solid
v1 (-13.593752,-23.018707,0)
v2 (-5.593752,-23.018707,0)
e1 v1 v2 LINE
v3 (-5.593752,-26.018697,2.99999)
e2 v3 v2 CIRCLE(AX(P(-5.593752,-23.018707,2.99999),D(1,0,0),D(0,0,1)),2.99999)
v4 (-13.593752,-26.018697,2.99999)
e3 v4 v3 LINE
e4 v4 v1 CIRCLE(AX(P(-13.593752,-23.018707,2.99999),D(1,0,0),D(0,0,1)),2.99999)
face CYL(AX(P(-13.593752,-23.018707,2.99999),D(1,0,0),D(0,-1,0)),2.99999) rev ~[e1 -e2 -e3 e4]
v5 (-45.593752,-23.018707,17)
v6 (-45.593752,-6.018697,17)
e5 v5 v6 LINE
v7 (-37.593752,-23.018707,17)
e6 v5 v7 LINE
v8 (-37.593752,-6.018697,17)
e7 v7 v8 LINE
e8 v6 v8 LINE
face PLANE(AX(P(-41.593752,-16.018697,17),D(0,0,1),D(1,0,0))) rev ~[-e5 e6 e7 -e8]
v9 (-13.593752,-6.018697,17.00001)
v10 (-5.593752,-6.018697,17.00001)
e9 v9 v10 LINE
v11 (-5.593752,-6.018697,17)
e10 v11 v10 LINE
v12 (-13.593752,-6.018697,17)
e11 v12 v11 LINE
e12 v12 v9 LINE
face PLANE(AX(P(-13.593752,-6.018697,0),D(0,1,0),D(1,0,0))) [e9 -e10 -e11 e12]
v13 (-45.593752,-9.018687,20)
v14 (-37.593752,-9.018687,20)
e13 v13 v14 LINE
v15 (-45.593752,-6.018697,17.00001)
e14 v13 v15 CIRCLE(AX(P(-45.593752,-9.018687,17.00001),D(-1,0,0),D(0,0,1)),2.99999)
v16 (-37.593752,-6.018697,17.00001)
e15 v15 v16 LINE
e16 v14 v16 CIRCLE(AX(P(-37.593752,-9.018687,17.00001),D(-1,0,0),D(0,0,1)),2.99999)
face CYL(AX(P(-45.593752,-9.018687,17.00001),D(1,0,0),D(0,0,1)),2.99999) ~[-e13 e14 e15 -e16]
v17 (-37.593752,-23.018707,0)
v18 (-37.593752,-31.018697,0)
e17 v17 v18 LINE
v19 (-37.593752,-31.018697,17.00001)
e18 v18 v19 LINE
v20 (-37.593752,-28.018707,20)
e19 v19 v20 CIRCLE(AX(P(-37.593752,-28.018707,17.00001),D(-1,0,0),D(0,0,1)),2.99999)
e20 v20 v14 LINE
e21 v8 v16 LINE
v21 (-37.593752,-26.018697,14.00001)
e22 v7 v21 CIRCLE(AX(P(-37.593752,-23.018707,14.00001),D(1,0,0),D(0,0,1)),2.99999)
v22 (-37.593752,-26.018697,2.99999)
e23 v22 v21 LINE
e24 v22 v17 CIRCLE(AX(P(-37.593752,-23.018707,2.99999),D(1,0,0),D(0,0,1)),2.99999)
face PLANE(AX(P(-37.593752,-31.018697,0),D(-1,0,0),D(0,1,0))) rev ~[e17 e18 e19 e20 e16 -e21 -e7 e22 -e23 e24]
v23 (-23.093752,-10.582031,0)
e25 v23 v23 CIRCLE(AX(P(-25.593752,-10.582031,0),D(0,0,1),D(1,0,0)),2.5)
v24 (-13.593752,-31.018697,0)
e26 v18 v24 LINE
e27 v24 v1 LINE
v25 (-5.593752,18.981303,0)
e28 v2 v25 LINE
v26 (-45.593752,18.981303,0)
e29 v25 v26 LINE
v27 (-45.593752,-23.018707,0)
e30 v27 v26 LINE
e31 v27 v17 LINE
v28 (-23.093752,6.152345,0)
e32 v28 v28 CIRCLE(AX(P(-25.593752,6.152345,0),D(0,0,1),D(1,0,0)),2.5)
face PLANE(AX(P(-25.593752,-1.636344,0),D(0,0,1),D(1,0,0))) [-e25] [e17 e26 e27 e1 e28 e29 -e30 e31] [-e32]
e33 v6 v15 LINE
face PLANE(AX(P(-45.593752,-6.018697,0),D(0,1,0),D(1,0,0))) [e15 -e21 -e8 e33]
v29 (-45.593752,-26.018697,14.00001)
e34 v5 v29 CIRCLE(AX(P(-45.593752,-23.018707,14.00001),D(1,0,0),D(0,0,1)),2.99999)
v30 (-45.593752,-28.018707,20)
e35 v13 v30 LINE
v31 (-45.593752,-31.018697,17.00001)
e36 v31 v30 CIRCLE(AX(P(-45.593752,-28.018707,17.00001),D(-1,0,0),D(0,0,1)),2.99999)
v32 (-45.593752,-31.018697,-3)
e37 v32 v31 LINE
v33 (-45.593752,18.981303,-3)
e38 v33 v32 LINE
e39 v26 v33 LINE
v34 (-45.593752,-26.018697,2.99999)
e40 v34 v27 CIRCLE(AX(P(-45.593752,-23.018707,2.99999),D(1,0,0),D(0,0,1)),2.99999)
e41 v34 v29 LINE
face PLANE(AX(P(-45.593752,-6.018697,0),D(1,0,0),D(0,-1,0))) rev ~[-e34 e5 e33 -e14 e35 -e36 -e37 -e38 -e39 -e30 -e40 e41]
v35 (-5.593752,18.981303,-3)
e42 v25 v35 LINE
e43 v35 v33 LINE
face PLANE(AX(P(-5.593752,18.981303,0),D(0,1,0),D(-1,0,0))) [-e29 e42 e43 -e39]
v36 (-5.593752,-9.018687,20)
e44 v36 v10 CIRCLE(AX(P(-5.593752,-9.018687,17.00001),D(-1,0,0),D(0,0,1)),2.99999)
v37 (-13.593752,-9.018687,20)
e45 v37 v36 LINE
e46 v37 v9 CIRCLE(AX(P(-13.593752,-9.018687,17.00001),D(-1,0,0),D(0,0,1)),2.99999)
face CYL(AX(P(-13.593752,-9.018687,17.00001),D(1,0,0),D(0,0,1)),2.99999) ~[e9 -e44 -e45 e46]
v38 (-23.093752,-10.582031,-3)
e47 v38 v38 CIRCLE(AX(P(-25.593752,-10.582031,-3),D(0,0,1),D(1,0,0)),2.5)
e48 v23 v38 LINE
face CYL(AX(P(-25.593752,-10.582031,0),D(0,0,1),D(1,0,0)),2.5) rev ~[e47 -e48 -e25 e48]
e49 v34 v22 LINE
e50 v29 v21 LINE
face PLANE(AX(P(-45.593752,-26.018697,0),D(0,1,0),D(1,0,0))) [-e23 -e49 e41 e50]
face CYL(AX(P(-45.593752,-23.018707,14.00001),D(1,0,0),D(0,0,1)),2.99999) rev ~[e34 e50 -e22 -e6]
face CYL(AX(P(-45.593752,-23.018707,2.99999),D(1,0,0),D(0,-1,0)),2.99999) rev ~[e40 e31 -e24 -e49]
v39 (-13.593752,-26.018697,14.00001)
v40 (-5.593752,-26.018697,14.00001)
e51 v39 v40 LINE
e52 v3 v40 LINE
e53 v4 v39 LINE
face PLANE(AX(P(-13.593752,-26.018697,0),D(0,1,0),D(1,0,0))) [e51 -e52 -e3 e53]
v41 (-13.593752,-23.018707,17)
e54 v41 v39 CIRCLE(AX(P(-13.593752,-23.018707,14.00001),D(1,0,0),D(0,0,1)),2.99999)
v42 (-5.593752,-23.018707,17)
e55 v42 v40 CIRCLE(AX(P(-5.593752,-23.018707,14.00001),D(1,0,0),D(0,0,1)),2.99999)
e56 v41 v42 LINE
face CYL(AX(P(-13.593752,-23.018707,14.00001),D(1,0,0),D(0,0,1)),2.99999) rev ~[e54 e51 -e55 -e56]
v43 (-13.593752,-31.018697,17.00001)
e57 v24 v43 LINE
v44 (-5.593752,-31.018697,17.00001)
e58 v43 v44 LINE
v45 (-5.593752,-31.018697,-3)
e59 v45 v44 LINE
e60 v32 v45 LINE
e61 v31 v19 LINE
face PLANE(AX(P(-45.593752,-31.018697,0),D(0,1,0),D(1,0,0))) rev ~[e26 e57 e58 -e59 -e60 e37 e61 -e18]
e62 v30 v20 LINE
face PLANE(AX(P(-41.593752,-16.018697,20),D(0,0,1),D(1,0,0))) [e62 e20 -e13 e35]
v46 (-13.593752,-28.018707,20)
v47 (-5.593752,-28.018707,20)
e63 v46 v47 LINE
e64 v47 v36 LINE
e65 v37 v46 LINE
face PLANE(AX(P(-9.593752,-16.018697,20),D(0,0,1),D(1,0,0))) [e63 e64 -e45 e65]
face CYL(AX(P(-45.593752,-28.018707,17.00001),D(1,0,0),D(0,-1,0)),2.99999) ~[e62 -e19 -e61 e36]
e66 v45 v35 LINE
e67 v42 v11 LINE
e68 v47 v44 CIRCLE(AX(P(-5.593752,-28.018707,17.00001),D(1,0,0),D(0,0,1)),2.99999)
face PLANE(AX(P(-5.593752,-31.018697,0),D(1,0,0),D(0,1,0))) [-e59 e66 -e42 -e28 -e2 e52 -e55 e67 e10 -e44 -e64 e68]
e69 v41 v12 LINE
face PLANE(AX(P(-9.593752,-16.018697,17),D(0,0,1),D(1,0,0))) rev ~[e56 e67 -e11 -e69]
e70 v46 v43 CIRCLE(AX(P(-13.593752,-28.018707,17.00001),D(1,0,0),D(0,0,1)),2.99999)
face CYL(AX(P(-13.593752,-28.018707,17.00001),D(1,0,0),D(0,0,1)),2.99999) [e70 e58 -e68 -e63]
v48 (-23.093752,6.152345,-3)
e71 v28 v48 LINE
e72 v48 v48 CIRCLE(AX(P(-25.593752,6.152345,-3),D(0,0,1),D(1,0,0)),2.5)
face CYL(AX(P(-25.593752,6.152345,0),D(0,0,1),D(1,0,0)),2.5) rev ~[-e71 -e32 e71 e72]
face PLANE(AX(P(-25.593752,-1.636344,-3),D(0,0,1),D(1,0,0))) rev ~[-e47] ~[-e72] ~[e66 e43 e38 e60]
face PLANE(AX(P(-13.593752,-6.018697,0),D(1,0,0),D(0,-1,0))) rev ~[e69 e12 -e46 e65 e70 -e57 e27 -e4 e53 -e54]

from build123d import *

# Parameters (mm, degrees)
F0_R     = 2.5
F0_W     = 8
F0_H     = 20
F0_H_2   = 5
F0_W_2   = 24
F1_DEPTH = 3
F2_DEPTH = 20
F3_DEPTH = 17
F4_R     = 2.99999


# Not quite as in the source:
# - a fillet or chamfer is up to 0.001 mm smaller than in the source, because OpenCascade refuses the exact size


with BuildPart() as f1:
    # F0 (on Top) → F1 (new body)
    with BuildSketch(Plane.XY):
        Polygon((-5.5937515758, 18.9813033898), (-45.5937515758, 18.9813033898), (-45.5937515758, -6.0186966102), (-37.5937515758, -6.0186966102), (-37.5937515758, -26.0186966102), (-13.5937515758, -26.0186966102), (-13.5937515758, -6.0186966102), (-5.5937515758, -6.0186966102), align=None)
        with Locations((-25.5937515758, -10.5820312165)):
            Circle(F0_R, mode=Mode.SUBTRACT)
        with Locations((-25.5937515758, 6.1523453332)):
            Circle(F0_R, mode=Mode.SUBTRACT)
        with Locations((-41.5937515758, -16.0186966102)):
            Rectangle(F0_W, F0_H)
        with Locations((-41.5937515758, -28.5186966102)):
            Rectangle(F0_W, F0_H_2)
        with Locations((-25.5937515758, -28.5186966102)):
            Rectangle(F0_W_2, F0_H_2)
        with Locations((-9.5937515758, -28.5186966102)):
            Rectangle(F0_W, F0_H_2)
        with Locations((-9.5937515758, -16.0186966102)):
            Rectangle(F0_W, F0_H)
    extrude(amount=-F1_DEPTH)

    # F0 (on Top) → F2 (join)
    with BuildSketch(Plane.XY):
        with Locations((-41.5937515758, -16.0186966102)):
            Rectangle(F0_W, F0_H)
        with Locations((-9.5937515758, -16.0186966102)):
            Rectangle(F0_W, F0_H)
        with Locations((-9.5937515758, -28.5186966102)):
            Rectangle(F0_W, F0_H_2)
        with Locations((-41.5937515758, -28.5186966102)):
            Rectangle(F0_W, F0_H_2)
    extrude(amount=F2_DEPTH)

    # F0 (on Top) → F3 (cut)
    with BuildSketch(Plane.XY):
        with Locations((-41.5937515758, -16.0186966102)):
            Rectangle(F0_W, F0_H)
        with Locations((-9.5937515758, -16.0186966102)):
            Rectangle(F0_W, F0_H)
    extrude(amount=F3_DEPTH, mode=Mode.SUBTRACT)

    # F4 (radius 3 in the source; OpenCascade refuses exactly that, so slightly less here)
    f4_edges = [f1.edges().sort_by_distance(p)[0] for p in [
        (-41.593752, -31.018697, 20),
        (-9.593752, -31.018697, 20),
        (-41.593752, -6.018697, 20),
        (-9.593752, -6.018697, 20),
        (-41.593752, -26.018697, 17),
        (-9.593752, -26.018697, 17),
        (-9.593752, -26.018697, 0),
        (-41.593752, -26.018697, 0),
    ]]
    fillet(f4_edges, radius=F4_R)


solid = f1.part
